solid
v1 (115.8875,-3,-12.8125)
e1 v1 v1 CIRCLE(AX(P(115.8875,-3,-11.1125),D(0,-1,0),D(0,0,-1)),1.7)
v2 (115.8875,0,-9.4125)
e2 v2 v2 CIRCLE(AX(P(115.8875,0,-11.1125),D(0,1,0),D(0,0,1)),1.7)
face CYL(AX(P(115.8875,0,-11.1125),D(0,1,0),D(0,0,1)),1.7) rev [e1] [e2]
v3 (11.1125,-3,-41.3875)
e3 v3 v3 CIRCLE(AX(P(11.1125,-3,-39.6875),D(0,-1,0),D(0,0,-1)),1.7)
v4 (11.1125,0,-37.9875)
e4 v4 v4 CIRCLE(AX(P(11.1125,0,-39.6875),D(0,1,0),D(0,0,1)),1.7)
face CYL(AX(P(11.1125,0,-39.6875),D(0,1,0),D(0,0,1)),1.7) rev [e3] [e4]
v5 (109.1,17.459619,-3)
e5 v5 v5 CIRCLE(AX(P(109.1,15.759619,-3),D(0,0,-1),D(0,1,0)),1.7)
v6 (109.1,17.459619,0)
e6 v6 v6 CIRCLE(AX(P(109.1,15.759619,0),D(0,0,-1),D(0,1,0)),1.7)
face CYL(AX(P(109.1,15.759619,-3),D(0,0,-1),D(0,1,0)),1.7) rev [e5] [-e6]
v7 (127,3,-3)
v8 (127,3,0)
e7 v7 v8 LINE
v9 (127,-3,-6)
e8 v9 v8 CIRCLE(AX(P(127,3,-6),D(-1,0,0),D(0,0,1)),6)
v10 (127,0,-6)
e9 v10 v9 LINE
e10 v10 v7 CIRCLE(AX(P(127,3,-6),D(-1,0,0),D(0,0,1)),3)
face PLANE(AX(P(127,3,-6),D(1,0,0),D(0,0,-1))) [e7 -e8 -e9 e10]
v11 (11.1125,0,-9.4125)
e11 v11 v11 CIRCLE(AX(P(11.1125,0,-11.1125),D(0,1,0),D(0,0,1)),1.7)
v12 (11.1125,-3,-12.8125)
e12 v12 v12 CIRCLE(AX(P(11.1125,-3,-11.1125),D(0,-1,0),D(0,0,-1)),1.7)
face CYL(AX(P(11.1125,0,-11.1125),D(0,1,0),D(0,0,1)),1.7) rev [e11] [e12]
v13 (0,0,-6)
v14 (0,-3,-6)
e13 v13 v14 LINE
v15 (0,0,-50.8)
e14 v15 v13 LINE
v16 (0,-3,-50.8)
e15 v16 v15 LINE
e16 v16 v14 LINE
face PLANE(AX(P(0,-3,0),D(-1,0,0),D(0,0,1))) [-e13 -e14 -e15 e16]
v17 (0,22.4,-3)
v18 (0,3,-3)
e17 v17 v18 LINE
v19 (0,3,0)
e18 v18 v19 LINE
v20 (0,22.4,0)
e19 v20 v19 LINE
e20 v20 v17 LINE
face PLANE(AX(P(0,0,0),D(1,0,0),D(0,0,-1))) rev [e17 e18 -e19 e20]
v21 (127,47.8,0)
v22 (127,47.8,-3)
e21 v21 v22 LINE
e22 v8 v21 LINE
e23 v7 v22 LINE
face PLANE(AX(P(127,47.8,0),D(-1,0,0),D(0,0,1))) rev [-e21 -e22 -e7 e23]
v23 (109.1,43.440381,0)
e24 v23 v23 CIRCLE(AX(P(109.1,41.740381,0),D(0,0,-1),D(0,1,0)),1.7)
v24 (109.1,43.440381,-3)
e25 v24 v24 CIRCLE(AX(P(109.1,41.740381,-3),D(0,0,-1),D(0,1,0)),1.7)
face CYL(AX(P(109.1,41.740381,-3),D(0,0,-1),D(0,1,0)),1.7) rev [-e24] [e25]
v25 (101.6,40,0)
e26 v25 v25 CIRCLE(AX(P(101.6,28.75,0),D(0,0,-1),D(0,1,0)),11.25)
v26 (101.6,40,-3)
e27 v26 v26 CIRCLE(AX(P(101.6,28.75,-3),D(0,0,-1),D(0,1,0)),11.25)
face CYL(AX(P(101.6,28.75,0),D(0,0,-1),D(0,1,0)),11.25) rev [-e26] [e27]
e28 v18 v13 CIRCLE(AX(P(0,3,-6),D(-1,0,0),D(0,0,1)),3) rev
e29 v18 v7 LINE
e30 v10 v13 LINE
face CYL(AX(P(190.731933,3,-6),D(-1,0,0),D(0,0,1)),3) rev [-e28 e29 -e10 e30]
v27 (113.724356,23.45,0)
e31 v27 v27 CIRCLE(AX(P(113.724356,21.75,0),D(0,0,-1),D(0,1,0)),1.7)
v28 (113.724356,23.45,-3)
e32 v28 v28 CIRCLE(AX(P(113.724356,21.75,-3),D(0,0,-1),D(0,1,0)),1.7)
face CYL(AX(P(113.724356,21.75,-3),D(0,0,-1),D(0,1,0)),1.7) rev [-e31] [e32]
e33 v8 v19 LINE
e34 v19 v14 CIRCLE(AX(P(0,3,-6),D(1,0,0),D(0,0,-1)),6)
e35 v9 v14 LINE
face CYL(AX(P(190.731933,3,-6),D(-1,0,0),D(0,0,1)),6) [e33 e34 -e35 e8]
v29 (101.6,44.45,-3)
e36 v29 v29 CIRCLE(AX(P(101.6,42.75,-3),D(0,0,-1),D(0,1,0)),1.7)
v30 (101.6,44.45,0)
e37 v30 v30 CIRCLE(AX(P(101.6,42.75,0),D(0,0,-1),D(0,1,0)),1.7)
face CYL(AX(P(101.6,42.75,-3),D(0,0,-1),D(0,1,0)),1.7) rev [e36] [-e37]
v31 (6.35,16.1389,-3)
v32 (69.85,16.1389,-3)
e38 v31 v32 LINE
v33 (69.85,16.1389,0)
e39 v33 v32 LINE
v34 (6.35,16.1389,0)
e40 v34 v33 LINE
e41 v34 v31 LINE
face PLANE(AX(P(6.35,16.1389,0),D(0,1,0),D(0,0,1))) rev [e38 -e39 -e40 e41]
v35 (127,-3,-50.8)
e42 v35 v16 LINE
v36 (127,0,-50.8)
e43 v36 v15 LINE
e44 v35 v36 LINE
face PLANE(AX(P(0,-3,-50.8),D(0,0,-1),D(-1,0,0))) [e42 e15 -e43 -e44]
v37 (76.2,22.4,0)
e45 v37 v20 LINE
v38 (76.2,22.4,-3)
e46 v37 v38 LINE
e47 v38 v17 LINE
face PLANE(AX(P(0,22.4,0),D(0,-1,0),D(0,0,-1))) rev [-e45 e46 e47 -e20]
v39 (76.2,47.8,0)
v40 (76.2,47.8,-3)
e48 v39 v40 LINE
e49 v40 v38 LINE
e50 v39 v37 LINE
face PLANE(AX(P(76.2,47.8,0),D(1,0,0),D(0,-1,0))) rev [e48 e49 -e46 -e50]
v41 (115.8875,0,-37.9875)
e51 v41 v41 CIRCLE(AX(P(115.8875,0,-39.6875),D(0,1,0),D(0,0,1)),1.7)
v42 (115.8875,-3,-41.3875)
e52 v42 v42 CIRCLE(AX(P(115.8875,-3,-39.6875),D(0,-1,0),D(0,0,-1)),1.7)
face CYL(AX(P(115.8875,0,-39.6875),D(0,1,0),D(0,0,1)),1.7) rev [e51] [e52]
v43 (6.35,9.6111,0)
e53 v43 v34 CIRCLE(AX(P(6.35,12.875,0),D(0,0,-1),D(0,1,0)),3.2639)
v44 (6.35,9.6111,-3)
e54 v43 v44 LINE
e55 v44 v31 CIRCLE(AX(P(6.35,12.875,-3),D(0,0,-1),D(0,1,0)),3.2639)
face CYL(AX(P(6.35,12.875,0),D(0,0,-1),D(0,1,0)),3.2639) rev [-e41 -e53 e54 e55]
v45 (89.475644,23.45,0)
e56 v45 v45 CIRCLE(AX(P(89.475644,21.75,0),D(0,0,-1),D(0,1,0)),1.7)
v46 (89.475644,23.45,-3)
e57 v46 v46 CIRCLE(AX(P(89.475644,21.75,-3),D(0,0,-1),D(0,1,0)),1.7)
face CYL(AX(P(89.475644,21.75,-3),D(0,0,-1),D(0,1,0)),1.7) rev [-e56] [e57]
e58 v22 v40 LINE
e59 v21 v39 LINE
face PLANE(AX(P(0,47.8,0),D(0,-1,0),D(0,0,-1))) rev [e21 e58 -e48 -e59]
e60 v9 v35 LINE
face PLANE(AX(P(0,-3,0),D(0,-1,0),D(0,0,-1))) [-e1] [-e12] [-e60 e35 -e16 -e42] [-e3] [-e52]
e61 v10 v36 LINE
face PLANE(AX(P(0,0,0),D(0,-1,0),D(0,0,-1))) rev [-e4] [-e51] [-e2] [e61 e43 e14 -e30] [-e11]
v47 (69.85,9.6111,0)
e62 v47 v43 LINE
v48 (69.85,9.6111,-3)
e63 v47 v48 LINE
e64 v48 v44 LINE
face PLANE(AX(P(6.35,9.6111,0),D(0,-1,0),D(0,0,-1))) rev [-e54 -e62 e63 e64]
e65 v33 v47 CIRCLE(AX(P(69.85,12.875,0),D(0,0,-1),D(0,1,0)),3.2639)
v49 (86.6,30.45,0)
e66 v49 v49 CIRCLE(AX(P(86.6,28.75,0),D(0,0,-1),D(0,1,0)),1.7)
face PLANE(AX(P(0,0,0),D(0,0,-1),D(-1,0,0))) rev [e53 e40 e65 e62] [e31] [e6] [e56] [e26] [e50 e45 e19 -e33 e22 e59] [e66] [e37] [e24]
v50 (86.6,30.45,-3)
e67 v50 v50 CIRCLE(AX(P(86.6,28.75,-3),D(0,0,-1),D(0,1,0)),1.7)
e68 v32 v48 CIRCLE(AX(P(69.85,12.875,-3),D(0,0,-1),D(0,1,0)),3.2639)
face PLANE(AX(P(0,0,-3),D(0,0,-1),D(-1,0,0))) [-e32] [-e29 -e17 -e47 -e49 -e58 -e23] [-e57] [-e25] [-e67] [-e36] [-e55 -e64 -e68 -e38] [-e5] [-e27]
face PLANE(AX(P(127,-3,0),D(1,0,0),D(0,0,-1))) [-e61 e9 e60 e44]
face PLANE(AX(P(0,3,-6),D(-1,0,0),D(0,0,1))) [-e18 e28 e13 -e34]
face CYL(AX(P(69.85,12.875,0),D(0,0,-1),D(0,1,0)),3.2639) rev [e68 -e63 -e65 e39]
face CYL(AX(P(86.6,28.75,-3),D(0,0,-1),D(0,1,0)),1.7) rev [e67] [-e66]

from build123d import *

# Parameters (mm, degrees)
SKETCH1_W                    = 127
SKETCH1_H                    = 50.8
BASE_FLANGE1_DEPTH           = 3
EDGE_FLANGE1_STRIP_W         = 18
EDGE_FLANGE1_STRIP_H         = 3
EDGE_FLANGE1_STRIP_CUT_DEPTH = 127
EDGE_FLANGE1_DEPTH           = 127
UNFOLD1_DEPTH                = 127
UNFOLD1_2_DEPTH              = 127
SKETCH9_R                    = 11.25
SKETCH9_W                    = 76.2
SKETCH9_H                    = 25.4
CUT_EXTRUDE1_DEPTH           = 137.816080926
M3_CLEARANCE_HOLE1_D         = 3.4
M3_CLEARANCE_HOLE1_DEPTH     = 7.62
M3_CLEARANCE_HOLE1_TIP       = 1.021463052
M3_CLEARANCE_HOLE2_D         = 3.4
M3_CLEARANCE_HOLE2_DEPTH     = 7.62
M3_CLEARANCE_HOLE2_TIP       = 1.021463052
FOLD1_START                  = -0.61644
FOLD1_OUTLINE_W              = 127
FOLD1_OUTLINE_H              = 3
FOLD1_DEPTH                  = 46.485023471
FOLD1_START_2                = -3
FOLD1_2_OUTLINE_R            = 1.7
FOLD1_2_OUTLINE_R_2          = 11.25
FOLD1_2_DEPTH                = 0.01644
FOLD1_START_3                = -6
FOLD1_3_OUTLINE_R            = 1.7
FOLD1_3_OUTLINE_R_2          = 11.25
FOLD1_3_DEPTH                = 6
FOLD1_4_DEPTH                = 127


with BuildPart() as part:
    # Base-Flange1: sheet metal written as solids
    # Sketch1 → Base-Flange1 (new body)
    with BuildSketch(Plane(origin=(0, 0, 0), x_dir=(1, 0, 0), z_dir=(0, 1, 0))):
        with Locations((63.5, 25.4)):
            Rectangle(SKETCH1_W, SKETCH1_H)
    extrude(amount=-BASE_FLANGE1_DEPTH)

    # Edge-Flange1: sheet metal written as solids
    # Edge-Flange1 strip (on a plane across the edge) → Edge-Flange1 strip cut (cut)
    with BuildSketch(Plane(origin=(0, 0, 0), x_dir=(0, 0, -1), z_dir=(1, 0, 0))):
        with Locations((-3, -1.5)):
            Rectangle(EDGE_FLANGE1_STRIP_W, EDGE_FLANGE1_STRIP_H)
    extrude(amount=EDGE_FLANGE1_STRIP_CUT_DEPTH, mode=Mode.SUBTRACT)

    # Edge-Flange1 section (on a plane across the edge) → Edge-Flange1 (add)
    with BuildSketch(Plane(origin=(0, 0, 0), x_dir=(0, 0, -1), z_dir=(1, 0, 0))):
        with BuildLine():
            Line((0, 3), (0, 47.8))
            Line((0, 47.8), (3, 47.8))
            Line((3, 47.8), (3, 3))
            ThreePointArc((3, 3), (3.878679656, 0.878679656), (6, 0))
            Line((6, 0), (6, -3))
            ThreePointArc((6, -3), (1.757359313, -1.242640687), (0, 3))
        make_face()
    extrude(amount=EDGE_FLANGE1_DEPTH)

    # Unfold1: read off the stored shape, not the designer's step
    # Unfold1 outline → Unfold1 (cut)
    with BuildSketch(Plane.YZ):
        with BuildLine():
            ThreePointArc((3, 0), (1.447085729, -0.204445042), (0, -0.803847577))
            Line((0, -0.803847577), (0, -6))
            ThreePointArc((0, -6), (0.878679656, -3.878679656), (3, -3))
            Line((3, -3), (47.8, -3))
            Line((47.8, -3), (47.8, 0))
            Line((47.8, 0), (3, 0))
        make_face()
    extrude(amount=UNFOLD1_DEPTH, mode=Mode.SUBTRACT)

    # Unfold1 2 outline → Unfold1 2 (add)
    with BuildSketch(Plane.YZ):
        with BuildLine():
            Line((-3, 45.868583471), (-3, -6))
            ThreePointArc((-3, -6), (-2.196152423, -3), (0, -0.803847577))
            Line((0, -0.803847577), (0, 45.868583471))
            Line((0, 45.868583471), (-3, 45.868583471))
        make_face()
    extrude(amount=UNFOLD1_2_DEPTH)

    # Sketch9 → Cut-Extrude1 (cut, through all)
    with BuildSketch(Plane(origin=(0, 0, 0), x_dir=(1, 0, 0), z_dir=(0, 1, 0))):
        with Locations(Location((101.6, -26.818583471, 0), (0, 0, 270))):
            Circle(SKETCH9_R)
        with Locations((38.1, -33.168583471)):
            Rectangle(SKETCH9_W, SKETCH9_H)
        with BuildLine():
            Line((6.35, -7.679683471), (69.85, -7.679683471))
            ThreePointArc((69.85, -7.679683471), (73.1139, -10.943583471), (69.85, -14.207483471))
            Line((69.85, -14.207483471), (6.35, -14.207483471))
            ThreePointArc((6.35, -14.207483471), (3.0861, -10.943583471), (6.35, -7.679683471))
        make_face()
    extrude(amount=-CUT_EXTRUDE1_DEPTH, mode=Mode.SUBTRACT)

    # M3 Clearance Hole1
    with Locations(Plane(origin=(0, 0, 0), x_dir=(1, 0, 0), z_dir=(0, 1, 0))):
        with Locations((109.1, -13.828202414), (101.6, -40.818583471), (109.1, -39.808964527), (89.475644347, -19.818583471), (86.6, -26.818583471), (113.724355653, -19.818583471)):
            Hole(M3_CLEARANCE_HOLE1_D / 2, depth=M3_CLEARANCE_HOLE1_DEPTH)
            with Locations((0, 0, -(M3_CLEARANCE_HOLE1_DEPTH + M3_CLEARANCE_HOLE1_TIP / 2))):  # 118° drill point
                Cone(0, M3_CLEARANCE_HOLE1_D / 2, M3_CLEARANCE_HOLE1_TIP, mode=Mode.SUBTRACT)

    # M3 Clearance Hole2
    with Locations(Plane(origin=(0, 0, 0), x_dir=(1, 0, 0), z_dir=(0, 1, 0))):
        with Locations((11.1125, 39.6875), (115.8875, 39.6875), (115.8875, 11.1125), (11.1125, 11.1125)):
            Hole(M3_CLEARANCE_HOLE2_D / 2, depth=M3_CLEARANCE_HOLE2_DEPTH)
            with Locations((0, 0, -(M3_CLEARANCE_HOLE2_DEPTH + M3_CLEARANCE_HOLE2_TIP / 2))):  # 118° drill point
                Cone(0, M3_CLEARANCE_HOLE2_D / 2, M3_CLEARANCE_HOLE2_TIP, mode=Mode.SUBTRACT)

    # Fold1: read off the stored shape, not the designer's step
    # Fold1 outline → Fold1 (cut)
    with BuildSketch(Plane.XY.offset(FOLD1_START)):
        with Locations((63.5, -1.5)):
            Rectangle(FOLD1_OUTLINE_W, FOLD1_OUTLINE_H)
    extrude(amount=FOLD1_DEPTH, mode=Mode.SUBTRACT)

    # Fold1 2 outline → Fold1 2 (add)
    with BuildSketch(Plane.XY.offset(FOLD1_START_2)):
        Polygon((0, 22.4), (0, 0), (127, 0), (127, 47.8), (76.2, 47.8), (76.2, 22.4), align=None)
        with BuildLine():
            Line((69.85, 9.6111), (6.35, 9.6111))
            ThreePointArc((6.35, 9.6111), (3.0861, 12.875), (6.35, 16.1389))
            Line((6.35, 16.1389), (69.85, 16.1389))
            ThreePointArc((69.85, 16.1389), (73.1139, 12.875), (69.85, 9.6111))
        make_face(mode=Mode.SUBTRACT)
        with Locations((89.475644347, 21.75)):
            Circle(FOLD1_2_OUTLINE_R, mode=Mode.SUBTRACT)
        with Locations((109.1, 15.759618943)):
            Circle(FOLD1_2_OUTLINE_R, mode=Mode.SUBTRACT)
        with Locations((113.724355653, 21.75)):
            Circle(FOLD1_2_OUTLINE_R, mode=Mode.SUBTRACT)
        with Locations((86.6, 28.75)):
            Circle(FOLD1_2_OUTLINE_R, mode=Mode.SUBTRACT)
        with Locations((101.6, 28.75)):
            Circle(FOLD1_2_OUTLINE_R_2, mode=Mode.SUBTRACT)
        with Locations((101.6, 42.75)):
            Circle(FOLD1_2_OUTLINE_R, mode=Mode.SUBTRACT)
        with Locations((109.1, 41.740381057)):
            Circle(FOLD1_2_OUTLINE_R, mode=Mode.SUBTRACT)
    extrude(amount=FOLD1_2_DEPTH)

    # Fold1 3 outline → Fold1 3 (add)
    with BuildSketch(Plane.XY.offset(FOLD1_START_3)):
        Polygon((0, 22.4), (0, 0), (127, 0), (127, 47.8), (76.2, 47.8), (76.2, 22.4), align=None)
        with BuildLine():
            Line((69.85, 9.6111), (6.35, 9.6111))
            ThreePointArc((6.35, 9.6111), (3.0861, 12.875), (6.35, 16.1389))
            Line((6.35, 16.1389), (69.85, 16.1389))
            ThreePointArc((69.85, 16.1389), (73.1139, 12.875), (69.85, 9.6111))
        make_face(mode=Mode.SUBTRACT)
        with Locations((89.475644347, 21.75)):
            Circle(FOLD1_3_OUTLINE_R, mode=Mode.SUBTRACT)
        with Locations((109.1, 15.759618943)):
            Circle(FOLD1_3_OUTLINE_R, mode=Mode.SUBTRACT)
        with Locations((113.724355653, 21.75)):
            Circle(FOLD1_3_OUTLINE_R, mode=Mode.SUBTRACT)
        with Locations((86.6, 28.75)):
            Circle(FOLD1_3_OUTLINE_R, mode=Mode.SUBTRACT)
        with Locations((101.6, 28.75)):
            Circle(FOLD1_3_OUTLINE_R_2, mode=Mode.SUBTRACT)
        with Locations((101.6, 42.75)):
            Circle(FOLD1_3_OUTLINE_R, mode=Mode.SUBTRACT)
        with Locations((109.1, 41.740381057)):
            Circle(FOLD1_3_OUTLINE_R, mode=Mode.SUBTRACT)
    extrude(amount=FOLD1_3_DEPTH)

    # Fold1 4 outline → Fold1 4 (cut)
    with BuildSketch(Plane.YZ):
        with BuildLine():
            ThreePointArc((-3, -6), (-1.242640687, -1.757359313), (3, 0))
            Line((3, 0), (0, 0))
            Line((0, 0), (0, -0.61644))
            Line((0, -0.61644), (-3, -0.61644))
            Line((-3, -0.61644), (-3, -6))
        make_face()
        with BuildLine():
            ThreePointArc((3, -3), (0.878679656, -3.878679656), (0, -6))
            Line((0, -6), (47.8, -6))
            Line((47.8, -6), (47.8, -3))
            Line((47.8, -3), (3, -3))
        make_face()
    extrude(amount=FOLD1_4_DEPTH, mode=Mode.SUBTRACT)


solid = part.part
